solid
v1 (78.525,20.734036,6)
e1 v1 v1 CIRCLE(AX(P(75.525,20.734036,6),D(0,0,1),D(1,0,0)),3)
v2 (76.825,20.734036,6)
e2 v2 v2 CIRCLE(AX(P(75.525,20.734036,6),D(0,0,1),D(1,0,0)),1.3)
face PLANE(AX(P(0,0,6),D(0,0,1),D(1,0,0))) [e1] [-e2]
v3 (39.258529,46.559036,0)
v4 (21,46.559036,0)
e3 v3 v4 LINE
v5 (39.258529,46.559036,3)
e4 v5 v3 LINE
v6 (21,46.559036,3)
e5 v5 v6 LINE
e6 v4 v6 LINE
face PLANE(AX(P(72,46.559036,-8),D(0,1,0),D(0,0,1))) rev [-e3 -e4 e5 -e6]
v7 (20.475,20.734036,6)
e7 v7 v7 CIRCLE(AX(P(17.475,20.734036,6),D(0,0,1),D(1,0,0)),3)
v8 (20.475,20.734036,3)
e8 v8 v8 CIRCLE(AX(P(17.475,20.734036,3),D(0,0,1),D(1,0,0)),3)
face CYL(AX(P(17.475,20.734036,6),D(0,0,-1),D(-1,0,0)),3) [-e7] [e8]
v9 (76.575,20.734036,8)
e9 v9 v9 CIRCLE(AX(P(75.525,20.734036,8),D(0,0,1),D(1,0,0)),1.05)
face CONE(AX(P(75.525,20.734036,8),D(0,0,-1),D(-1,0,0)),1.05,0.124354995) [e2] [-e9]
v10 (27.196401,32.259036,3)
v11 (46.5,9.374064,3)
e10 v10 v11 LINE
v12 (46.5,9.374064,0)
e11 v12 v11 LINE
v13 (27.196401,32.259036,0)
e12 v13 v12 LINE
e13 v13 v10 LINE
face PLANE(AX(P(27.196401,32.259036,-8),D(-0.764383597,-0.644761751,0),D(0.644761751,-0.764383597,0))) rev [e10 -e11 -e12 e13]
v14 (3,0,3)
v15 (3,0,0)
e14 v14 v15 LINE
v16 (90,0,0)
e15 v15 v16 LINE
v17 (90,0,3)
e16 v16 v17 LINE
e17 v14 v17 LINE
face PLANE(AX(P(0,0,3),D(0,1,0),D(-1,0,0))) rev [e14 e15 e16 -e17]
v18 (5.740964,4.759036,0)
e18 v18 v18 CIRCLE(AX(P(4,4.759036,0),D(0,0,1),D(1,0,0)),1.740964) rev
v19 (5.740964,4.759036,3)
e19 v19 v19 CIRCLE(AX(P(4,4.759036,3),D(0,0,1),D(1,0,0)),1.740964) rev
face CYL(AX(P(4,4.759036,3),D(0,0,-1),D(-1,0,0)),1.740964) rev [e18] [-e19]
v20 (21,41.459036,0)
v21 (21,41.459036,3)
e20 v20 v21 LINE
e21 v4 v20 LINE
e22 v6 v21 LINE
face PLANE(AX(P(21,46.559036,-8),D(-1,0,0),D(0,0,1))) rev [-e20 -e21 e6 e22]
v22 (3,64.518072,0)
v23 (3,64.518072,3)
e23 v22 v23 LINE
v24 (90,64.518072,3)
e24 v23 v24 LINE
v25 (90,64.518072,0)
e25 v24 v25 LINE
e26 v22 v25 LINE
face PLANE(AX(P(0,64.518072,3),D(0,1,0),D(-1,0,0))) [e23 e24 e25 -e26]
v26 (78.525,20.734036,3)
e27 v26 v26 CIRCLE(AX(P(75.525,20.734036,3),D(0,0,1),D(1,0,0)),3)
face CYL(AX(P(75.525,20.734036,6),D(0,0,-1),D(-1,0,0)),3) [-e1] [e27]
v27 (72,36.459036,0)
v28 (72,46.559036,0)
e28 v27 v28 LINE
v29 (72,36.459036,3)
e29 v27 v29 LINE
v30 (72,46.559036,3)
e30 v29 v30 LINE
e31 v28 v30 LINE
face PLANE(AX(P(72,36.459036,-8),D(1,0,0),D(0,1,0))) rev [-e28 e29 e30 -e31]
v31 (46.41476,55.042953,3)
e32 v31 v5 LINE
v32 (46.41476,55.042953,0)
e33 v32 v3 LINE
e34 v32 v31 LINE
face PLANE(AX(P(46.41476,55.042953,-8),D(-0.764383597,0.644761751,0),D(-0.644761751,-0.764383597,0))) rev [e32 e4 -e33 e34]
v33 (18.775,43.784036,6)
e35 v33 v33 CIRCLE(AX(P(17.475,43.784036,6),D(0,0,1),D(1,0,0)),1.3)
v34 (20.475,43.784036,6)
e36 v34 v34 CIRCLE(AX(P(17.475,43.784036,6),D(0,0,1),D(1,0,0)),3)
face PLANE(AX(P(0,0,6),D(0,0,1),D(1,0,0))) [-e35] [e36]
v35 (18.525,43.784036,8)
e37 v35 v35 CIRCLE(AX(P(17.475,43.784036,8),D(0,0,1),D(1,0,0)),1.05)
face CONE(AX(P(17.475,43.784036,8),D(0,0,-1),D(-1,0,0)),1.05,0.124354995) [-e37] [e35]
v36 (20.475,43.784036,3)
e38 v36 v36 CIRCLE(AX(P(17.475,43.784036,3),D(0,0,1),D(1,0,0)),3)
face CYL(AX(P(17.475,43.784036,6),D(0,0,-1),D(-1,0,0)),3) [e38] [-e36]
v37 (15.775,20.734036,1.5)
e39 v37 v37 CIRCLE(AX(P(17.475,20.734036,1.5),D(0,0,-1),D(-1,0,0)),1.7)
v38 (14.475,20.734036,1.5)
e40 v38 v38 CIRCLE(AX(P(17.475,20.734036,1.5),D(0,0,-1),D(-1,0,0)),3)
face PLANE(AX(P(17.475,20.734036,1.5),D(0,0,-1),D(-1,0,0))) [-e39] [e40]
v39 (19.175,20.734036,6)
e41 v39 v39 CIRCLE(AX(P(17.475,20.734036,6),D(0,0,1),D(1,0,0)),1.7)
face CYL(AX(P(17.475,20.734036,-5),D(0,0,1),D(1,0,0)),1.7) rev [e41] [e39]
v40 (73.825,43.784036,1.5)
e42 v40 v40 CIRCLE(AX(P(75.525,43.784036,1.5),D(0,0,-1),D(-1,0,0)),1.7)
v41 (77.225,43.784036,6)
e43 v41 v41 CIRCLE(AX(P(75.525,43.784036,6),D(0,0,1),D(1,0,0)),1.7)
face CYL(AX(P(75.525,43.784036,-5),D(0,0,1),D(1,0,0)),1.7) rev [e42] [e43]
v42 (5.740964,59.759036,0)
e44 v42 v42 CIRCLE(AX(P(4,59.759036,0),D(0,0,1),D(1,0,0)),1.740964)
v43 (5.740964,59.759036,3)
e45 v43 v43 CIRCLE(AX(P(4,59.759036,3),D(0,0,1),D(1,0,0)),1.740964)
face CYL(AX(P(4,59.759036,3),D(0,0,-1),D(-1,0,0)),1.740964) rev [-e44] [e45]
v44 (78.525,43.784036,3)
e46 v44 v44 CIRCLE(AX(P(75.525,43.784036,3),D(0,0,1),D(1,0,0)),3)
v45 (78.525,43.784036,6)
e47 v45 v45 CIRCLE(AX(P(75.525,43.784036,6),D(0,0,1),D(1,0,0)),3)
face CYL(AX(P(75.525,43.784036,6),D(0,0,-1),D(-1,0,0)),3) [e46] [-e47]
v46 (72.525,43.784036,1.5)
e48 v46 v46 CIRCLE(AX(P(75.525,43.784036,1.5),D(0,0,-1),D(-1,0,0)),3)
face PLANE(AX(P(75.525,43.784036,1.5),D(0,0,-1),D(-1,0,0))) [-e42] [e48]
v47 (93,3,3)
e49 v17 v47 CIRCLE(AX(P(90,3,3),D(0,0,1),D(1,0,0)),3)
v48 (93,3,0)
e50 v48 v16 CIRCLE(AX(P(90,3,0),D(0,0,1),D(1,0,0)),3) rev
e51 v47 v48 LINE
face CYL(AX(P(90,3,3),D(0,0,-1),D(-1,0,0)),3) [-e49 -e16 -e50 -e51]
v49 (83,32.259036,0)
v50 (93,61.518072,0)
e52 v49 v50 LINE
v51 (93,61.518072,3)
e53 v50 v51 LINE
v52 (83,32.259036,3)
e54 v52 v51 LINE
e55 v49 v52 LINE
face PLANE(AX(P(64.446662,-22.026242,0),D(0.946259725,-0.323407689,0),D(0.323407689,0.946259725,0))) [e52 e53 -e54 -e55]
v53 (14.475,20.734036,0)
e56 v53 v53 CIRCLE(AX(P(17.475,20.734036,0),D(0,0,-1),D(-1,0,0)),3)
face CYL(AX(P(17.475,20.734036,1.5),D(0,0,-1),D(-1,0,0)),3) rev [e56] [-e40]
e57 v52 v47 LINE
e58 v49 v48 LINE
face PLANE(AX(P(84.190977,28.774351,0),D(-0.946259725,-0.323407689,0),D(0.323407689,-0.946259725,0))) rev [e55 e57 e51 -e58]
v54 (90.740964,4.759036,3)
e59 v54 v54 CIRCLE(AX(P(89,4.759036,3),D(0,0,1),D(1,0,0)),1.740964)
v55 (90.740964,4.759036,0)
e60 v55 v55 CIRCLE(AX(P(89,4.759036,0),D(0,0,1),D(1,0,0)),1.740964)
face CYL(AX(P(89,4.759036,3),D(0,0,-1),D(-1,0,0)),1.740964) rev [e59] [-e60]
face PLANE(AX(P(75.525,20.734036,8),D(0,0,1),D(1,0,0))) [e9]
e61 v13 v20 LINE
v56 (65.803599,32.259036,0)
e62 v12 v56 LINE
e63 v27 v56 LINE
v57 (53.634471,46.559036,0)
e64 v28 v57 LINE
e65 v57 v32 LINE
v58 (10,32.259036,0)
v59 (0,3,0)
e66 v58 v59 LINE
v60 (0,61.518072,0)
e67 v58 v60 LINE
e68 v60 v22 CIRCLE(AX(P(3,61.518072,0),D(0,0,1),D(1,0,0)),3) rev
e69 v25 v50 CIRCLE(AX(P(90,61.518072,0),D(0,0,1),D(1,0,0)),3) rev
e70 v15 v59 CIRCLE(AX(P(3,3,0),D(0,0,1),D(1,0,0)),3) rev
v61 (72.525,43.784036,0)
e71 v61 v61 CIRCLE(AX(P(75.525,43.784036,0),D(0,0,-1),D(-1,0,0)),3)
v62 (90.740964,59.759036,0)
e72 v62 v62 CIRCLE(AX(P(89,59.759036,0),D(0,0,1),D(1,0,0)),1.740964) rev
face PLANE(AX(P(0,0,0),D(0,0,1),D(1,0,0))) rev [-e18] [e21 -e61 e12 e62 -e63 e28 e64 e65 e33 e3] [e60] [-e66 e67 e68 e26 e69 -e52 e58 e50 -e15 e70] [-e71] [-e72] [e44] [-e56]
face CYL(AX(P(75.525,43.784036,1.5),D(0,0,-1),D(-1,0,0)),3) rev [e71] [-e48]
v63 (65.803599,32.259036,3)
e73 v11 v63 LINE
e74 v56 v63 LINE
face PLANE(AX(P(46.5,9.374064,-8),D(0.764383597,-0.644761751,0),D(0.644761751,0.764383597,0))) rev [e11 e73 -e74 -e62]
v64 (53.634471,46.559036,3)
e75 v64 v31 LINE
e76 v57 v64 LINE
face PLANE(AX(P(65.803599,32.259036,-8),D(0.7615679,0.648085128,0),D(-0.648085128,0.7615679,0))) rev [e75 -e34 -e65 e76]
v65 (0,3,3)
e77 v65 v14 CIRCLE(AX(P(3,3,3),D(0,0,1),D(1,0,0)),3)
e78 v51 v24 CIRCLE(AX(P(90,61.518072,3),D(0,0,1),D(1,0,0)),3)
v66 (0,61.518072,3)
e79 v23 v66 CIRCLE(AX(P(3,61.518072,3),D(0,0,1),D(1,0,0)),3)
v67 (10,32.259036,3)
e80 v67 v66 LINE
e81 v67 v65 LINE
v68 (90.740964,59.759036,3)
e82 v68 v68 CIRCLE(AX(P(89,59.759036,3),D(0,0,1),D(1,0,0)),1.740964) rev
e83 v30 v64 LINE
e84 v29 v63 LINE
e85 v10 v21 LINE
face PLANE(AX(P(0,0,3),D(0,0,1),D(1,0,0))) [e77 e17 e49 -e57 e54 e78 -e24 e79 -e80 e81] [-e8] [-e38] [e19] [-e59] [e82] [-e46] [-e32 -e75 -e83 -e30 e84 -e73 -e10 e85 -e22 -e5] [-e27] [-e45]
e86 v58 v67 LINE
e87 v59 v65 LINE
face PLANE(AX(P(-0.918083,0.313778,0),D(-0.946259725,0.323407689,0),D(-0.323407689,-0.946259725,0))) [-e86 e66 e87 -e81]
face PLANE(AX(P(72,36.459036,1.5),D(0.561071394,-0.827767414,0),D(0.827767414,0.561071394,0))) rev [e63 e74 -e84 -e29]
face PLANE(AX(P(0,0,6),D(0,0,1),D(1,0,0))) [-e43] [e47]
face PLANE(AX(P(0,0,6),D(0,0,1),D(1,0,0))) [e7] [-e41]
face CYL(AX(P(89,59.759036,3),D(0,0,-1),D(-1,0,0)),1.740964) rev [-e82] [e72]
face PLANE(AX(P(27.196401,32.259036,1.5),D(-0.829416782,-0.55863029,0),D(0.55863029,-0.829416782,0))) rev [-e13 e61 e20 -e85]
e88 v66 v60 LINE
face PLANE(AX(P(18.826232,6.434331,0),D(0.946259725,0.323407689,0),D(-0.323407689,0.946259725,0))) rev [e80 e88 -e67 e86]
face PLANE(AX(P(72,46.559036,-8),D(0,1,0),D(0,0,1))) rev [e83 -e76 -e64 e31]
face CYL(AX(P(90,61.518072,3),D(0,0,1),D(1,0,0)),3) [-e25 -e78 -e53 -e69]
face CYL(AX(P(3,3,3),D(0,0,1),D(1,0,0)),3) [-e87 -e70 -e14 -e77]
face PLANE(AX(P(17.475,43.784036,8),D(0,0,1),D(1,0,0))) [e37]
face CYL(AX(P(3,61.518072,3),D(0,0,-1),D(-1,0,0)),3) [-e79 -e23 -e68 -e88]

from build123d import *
from OCP.BRepFilletAPI import BRepFilletAPI_MakeChamfer

# Parameters (mm, degrees)
SKETCH2_W           = 93
SKETCH2_H           = 64.518072289
SKETCH2_R           = 1.740963855
BOSS_EXTRUDE1_DEPTH = 3
FILLET1_R           = 3
SKETCH3_R           = 3
SKETCH3_R_2         = 1.325
BOSS_EXTRUDE2_DEPTH = 3
SKETCH4_R           = 1.3
BOSS_EXTRUDE3_DEPTH = 2
SKETCH5_R           = 1.7
CUT_EXTRUDE1_DEPTH  = 11
CHAMFER1_SIZE       = 2
CHAMFER1_SIZE_2     = 0.25
CUT_EXTRUDE2_DEPTH  = 11
CUT_EXTRUDE3_DEPTH  = 11
SKETCH8_R           = 3
SKETCH8_R_2         = 1.7
CUT_EXTRUDE4_DEPTH  = 1.5
CUT_EXTRUDE5_DEPTH  = 1.5
CUT_EXTRUDE6_DEPTH  = 3


with BuildPart() as part:
    # Sketch2 → Boss-Extrude1 (new body)
    with BuildSketch(Plane.XY):
        with Locations((46.5, 32.259036145)):
            Rectangle(SKETCH2_W, SKETCH2_H)
        with Locations((89, 4.759036145)):
            Circle(SKETCH2_R, mode=Mode.SUBTRACT)
        with Locations((89, 59.759036145)):
            Circle(SKETCH2_R, mode=Mode.SUBTRACT)
        with Locations((4, 59.759036145)):
            Circle(SKETCH2_R, mode=Mode.SUBTRACT)
        with Locations((4, 4.759036145)):
            Circle(SKETCH2_R, mode=Mode.SUBTRACT)
    extrude(amount=BOSS_EXTRUDE1_DEPTH)

    # Fillet1
    fillet1_edges = [part.edges().sort_by_distance(p)[0] for p in [
        (0, 0, 1.5),
        (0, 64.518072289, 1.5),
        (93, 64.518072289, 1.5),
        (93, 0, 1.5),
    ]]
    fillet(fillet1_edges, radius=FILLET1_R)

    # Sketch3 → Boss-Extrude2 (add)
    # profile 1 of 8: a face of its own
    with BuildSketch(Plane.XY.offset(3)):
        with Locations((17.475, 43.784036145)):
            Circle(SKETCH3_R)
        with Locations((17.475, 43.784036145)):
            Circle(SKETCH3_R_2, mode=Mode.SUBTRACT)
    # profile 2 of 8: a face of its own
    with BuildSketch(Plane.XY.offset(3)):
        with Locations((17.475, 20.734036145)):
            Circle(SKETCH3_R)
        with Locations((17.475, 20.734036145)):
            Circle(SKETCH3_R_2, mode=Mode.SUBTRACT)
    # profile 3 of 8: a face of its own
    with BuildSketch(Plane.XY.offset(3)):
        with Locations((17.475, 20.734036145)):
            Circle(SKETCH3_R_2)
    # profile 4 of 8: a face of its own
    with BuildSketch(Plane.XY.offset(3)):
        with Locations((75.525, 43.784036145)):
            Circle(SKETCH3_R)
        with Locations((75.525, 43.784036145)):
            Circle(SKETCH3_R_2, mode=Mode.SUBTRACT)
    # profile 5 of 8: a face of its own
    with BuildSketch(Plane.XY.offset(3)):
        with Locations((75.525, 43.784036145)):
            Circle(SKETCH3_R_2)
    # profile 6 of 8: a face of its own
    with BuildSketch(Plane.XY.offset(3)):
        with Locations((75.525, 20.734036145)):
            Circle(SKETCH3_R)
        with Locations((75.525, 20.734036145)):
            Circle(SKETCH3_R_2, mode=Mode.SUBTRACT)
    # profile 7 of 8: a face of its own
    with BuildSketch(Plane.XY.offset(3)):
        with Locations((75.525, 20.734036145)):
            Circle(SKETCH3_R_2)
    # profile 8 of 8: a face of its own
    with BuildSketch(Plane.XY.offset(3)):
        with Locations((17.475, 43.784036145)):
            Circle(SKETCH3_R_2)
    extrude(amount=BOSS_EXTRUDE2_DEPTH)

    # Sketch4 → Boss-Extrude3 (add)
    with BuildSketch(Plane.XY.offset(6)):
        with Locations((75.525, 20.734036145)):
            Circle(SKETCH4_R)
        with Locations((17.475, 43.784036145)):
            Circle(SKETCH4_R)
    extrude(amount=BOSS_EXTRUDE3_DEPTH)

    # Sketch5 → Cut-Extrude1 (cut)
    with BuildSketch(Plane.XY.offset(6)):
        with Locations((17.475, 20.734036145)):
            Circle(SKETCH5_R)
        with Locations((75.525, 43.784036145)):
            Circle(SKETCH5_R)
    extrude(amount=-CUT_EXTRUDE1_DEPTH, mode=Mode.SUBTRACT)

    # Chamfer1
    chamfer1_edges_1 = [part.edges().sort_by_distance(p)[0] for p in [
        (74.225, 20.734036145, 8),
    ]]
    chamfer1_side_1 = [part.faces().sort_by_distance(p)[0] for p in [
        (74.225, 20.734036145, 7.995),
    ]]
    chamfer1_edges_2 = [part.edges().sort_by_distance(p)[0] for p in [
        (16.175, 43.784036145, 8),
    ]]
    chamfer1_side_2 = [part.faces().sort_by_distance(p)[0] for p in [
        (16.175, 43.784036145, 7.995),
    ]]
    chamfer1 = BRepFilletAPI_MakeChamfer(part.part.solid().wrapped)
    for e in chamfer1_edges_1:
        chamfer1.Add(CHAMFER1_SIZE - 0.0001, CHAMFER1_SIZE_2 - 0.0001, e.wrapped, chamfer1_side_1[0].wrapped)
    for e in chamfer1_edges_2:
        chamfer1.Add(CHAMFER1_SIZE - 0.0001, CHAMFER1_SIZE_2 - 0.0001, e.wrapped, chamfer1_side_2[0].wrapped)
    add(Compound.cast(chamfer1.Shape()), mode=Mode.REPLACE)  # a hair under: the kernel refuses the full size

    # Sketch6 → Cut-Extrude2 (cut)
    with BuildSketch(Plane.XY.offset(3)):
        Polygon((46.41475966, 55.04295344), (27.196400626, 32.259036144), (46.5, 9.374063974), (65.803599374, 32.259036145), align=None)
    extrude(amount=-CUT_EXTRUDE2_DEPTH, mode=Mode.SUBTRACT)

    # Sketch7 → Cut-Extrude3 (cut)
    with BuildSketch(Plane.XY.offset(3)):
        Polygon((21, 46.559036145), (21, 41.459036145), (66.9, 41.459036145), (66.9, 36.459036145), (72, 36.459036145), (72, 46.559036145), align=None)
    extrude(amount=-CUT_EXTRUDE3_DEPTH, mode=Mode.SUBTRACT)

    # Sketch8 → Cut-Extrude4 (cut)
    # profile 1 of 4: a face of its own
    with BuildSketch(Plane(origin=(0, 0, 0), x_dir=(-1, 0, 0), z_dir=(0, 0, -1))):
        with Locations(Location((-75.525, 43.784036145, 0), (0, 0, 180))):
            Circle(SKETCH8_R)
        with Locations(Location((-75.525, 43.784036145, 0), (0, 0, 180))):
            Circle(SKETCH8_R_2, mode=Mode.SUBTRACT)
    # profile 2 of 4: a face of its own
    with BuildSketch(Plane(origin=(0, 0, 0), x_dir=(-1, 0, 0), z_dir=(0, 0, -1))):
        with Locations(Location((-17.475, 20.734036145, 0), (0, 0, 180))):
            Circle(SKETCH8_R)
        with Locations(Location((-17.475, 20.734036145, 0), (0, 0, 180))):
            Circle(SKETCH8_R_2, mode=Mode.SUBTRACT)
    # profile 3 of 4: a face of its own
    with BuildSketch(Plane(origin=(0, 0, 0), x_dir=(-1, 0, 0), z_dir=(0, 0, -1))):
        Polygon((-72, 36.459036145), (-65.803599374, 32.259036145), (-57.974509975, 41.459036145), (-66.9, 41.459036145), align=None)
    # profile 4 of 4: a face of its own
    with BuildSketch(Plane(origin=(0, 0, 0), x_dir=(-1, 0, 0), z_dir=(0, 0, -1))):
        Polygon((-27.196400626, 32.259036144), (-21, 41.459036145), (-34.956651017, 41.459036145), align=None)
    extrude(amount=-CUT_EXTRUDE4_DEPTH, mode=Mode.SUBTRACT)

    # Sketch9 → Cut-Extrude5 (cut)
    with BuildSketch(Plane(origin=(0, 0, 1.5), x_dir=(-1, 0, 0), z_dir=(0, 0, -1))):
        Polygon((-66.9, 36.459036145), (-72, 36.459036145), (-65.803599374, 32.259036145), (-57.974509975, 41.459036145), (-66.9, 41.459036145), align=None)
        Polygon((-34.956651017, 41.459036145), (-27.196400626, 32.259036144), (-21, 41.459036145), align=None)
    extrude(amount=-CUT_EXTRUDE5_DEPTH, mode=Mode.SUBTRACT)

    # Sketch10 → Cut-Extrude6 (cut)
    with BuildSketch(Plane.XY.offset(3)):
        Polygon((0, 61.518072289), (0, 32.259036145), (10, 32.259036145), align=None)
        Polygon((10, 32.259036145), (0, 32.259036145), (0, 3), align=None)
        Polygon((93, 32.259036145), (93, 61.518072289), (83, 32.259036145), align=None)
        Polygon((83, 32.259036145), (93, 3), (93, 32.259036145), align=None)
    extrude(amount=-CUT_EXTRUDE6_DEPTH, mode=Mode.SUBTRACT)


solid = part.part
